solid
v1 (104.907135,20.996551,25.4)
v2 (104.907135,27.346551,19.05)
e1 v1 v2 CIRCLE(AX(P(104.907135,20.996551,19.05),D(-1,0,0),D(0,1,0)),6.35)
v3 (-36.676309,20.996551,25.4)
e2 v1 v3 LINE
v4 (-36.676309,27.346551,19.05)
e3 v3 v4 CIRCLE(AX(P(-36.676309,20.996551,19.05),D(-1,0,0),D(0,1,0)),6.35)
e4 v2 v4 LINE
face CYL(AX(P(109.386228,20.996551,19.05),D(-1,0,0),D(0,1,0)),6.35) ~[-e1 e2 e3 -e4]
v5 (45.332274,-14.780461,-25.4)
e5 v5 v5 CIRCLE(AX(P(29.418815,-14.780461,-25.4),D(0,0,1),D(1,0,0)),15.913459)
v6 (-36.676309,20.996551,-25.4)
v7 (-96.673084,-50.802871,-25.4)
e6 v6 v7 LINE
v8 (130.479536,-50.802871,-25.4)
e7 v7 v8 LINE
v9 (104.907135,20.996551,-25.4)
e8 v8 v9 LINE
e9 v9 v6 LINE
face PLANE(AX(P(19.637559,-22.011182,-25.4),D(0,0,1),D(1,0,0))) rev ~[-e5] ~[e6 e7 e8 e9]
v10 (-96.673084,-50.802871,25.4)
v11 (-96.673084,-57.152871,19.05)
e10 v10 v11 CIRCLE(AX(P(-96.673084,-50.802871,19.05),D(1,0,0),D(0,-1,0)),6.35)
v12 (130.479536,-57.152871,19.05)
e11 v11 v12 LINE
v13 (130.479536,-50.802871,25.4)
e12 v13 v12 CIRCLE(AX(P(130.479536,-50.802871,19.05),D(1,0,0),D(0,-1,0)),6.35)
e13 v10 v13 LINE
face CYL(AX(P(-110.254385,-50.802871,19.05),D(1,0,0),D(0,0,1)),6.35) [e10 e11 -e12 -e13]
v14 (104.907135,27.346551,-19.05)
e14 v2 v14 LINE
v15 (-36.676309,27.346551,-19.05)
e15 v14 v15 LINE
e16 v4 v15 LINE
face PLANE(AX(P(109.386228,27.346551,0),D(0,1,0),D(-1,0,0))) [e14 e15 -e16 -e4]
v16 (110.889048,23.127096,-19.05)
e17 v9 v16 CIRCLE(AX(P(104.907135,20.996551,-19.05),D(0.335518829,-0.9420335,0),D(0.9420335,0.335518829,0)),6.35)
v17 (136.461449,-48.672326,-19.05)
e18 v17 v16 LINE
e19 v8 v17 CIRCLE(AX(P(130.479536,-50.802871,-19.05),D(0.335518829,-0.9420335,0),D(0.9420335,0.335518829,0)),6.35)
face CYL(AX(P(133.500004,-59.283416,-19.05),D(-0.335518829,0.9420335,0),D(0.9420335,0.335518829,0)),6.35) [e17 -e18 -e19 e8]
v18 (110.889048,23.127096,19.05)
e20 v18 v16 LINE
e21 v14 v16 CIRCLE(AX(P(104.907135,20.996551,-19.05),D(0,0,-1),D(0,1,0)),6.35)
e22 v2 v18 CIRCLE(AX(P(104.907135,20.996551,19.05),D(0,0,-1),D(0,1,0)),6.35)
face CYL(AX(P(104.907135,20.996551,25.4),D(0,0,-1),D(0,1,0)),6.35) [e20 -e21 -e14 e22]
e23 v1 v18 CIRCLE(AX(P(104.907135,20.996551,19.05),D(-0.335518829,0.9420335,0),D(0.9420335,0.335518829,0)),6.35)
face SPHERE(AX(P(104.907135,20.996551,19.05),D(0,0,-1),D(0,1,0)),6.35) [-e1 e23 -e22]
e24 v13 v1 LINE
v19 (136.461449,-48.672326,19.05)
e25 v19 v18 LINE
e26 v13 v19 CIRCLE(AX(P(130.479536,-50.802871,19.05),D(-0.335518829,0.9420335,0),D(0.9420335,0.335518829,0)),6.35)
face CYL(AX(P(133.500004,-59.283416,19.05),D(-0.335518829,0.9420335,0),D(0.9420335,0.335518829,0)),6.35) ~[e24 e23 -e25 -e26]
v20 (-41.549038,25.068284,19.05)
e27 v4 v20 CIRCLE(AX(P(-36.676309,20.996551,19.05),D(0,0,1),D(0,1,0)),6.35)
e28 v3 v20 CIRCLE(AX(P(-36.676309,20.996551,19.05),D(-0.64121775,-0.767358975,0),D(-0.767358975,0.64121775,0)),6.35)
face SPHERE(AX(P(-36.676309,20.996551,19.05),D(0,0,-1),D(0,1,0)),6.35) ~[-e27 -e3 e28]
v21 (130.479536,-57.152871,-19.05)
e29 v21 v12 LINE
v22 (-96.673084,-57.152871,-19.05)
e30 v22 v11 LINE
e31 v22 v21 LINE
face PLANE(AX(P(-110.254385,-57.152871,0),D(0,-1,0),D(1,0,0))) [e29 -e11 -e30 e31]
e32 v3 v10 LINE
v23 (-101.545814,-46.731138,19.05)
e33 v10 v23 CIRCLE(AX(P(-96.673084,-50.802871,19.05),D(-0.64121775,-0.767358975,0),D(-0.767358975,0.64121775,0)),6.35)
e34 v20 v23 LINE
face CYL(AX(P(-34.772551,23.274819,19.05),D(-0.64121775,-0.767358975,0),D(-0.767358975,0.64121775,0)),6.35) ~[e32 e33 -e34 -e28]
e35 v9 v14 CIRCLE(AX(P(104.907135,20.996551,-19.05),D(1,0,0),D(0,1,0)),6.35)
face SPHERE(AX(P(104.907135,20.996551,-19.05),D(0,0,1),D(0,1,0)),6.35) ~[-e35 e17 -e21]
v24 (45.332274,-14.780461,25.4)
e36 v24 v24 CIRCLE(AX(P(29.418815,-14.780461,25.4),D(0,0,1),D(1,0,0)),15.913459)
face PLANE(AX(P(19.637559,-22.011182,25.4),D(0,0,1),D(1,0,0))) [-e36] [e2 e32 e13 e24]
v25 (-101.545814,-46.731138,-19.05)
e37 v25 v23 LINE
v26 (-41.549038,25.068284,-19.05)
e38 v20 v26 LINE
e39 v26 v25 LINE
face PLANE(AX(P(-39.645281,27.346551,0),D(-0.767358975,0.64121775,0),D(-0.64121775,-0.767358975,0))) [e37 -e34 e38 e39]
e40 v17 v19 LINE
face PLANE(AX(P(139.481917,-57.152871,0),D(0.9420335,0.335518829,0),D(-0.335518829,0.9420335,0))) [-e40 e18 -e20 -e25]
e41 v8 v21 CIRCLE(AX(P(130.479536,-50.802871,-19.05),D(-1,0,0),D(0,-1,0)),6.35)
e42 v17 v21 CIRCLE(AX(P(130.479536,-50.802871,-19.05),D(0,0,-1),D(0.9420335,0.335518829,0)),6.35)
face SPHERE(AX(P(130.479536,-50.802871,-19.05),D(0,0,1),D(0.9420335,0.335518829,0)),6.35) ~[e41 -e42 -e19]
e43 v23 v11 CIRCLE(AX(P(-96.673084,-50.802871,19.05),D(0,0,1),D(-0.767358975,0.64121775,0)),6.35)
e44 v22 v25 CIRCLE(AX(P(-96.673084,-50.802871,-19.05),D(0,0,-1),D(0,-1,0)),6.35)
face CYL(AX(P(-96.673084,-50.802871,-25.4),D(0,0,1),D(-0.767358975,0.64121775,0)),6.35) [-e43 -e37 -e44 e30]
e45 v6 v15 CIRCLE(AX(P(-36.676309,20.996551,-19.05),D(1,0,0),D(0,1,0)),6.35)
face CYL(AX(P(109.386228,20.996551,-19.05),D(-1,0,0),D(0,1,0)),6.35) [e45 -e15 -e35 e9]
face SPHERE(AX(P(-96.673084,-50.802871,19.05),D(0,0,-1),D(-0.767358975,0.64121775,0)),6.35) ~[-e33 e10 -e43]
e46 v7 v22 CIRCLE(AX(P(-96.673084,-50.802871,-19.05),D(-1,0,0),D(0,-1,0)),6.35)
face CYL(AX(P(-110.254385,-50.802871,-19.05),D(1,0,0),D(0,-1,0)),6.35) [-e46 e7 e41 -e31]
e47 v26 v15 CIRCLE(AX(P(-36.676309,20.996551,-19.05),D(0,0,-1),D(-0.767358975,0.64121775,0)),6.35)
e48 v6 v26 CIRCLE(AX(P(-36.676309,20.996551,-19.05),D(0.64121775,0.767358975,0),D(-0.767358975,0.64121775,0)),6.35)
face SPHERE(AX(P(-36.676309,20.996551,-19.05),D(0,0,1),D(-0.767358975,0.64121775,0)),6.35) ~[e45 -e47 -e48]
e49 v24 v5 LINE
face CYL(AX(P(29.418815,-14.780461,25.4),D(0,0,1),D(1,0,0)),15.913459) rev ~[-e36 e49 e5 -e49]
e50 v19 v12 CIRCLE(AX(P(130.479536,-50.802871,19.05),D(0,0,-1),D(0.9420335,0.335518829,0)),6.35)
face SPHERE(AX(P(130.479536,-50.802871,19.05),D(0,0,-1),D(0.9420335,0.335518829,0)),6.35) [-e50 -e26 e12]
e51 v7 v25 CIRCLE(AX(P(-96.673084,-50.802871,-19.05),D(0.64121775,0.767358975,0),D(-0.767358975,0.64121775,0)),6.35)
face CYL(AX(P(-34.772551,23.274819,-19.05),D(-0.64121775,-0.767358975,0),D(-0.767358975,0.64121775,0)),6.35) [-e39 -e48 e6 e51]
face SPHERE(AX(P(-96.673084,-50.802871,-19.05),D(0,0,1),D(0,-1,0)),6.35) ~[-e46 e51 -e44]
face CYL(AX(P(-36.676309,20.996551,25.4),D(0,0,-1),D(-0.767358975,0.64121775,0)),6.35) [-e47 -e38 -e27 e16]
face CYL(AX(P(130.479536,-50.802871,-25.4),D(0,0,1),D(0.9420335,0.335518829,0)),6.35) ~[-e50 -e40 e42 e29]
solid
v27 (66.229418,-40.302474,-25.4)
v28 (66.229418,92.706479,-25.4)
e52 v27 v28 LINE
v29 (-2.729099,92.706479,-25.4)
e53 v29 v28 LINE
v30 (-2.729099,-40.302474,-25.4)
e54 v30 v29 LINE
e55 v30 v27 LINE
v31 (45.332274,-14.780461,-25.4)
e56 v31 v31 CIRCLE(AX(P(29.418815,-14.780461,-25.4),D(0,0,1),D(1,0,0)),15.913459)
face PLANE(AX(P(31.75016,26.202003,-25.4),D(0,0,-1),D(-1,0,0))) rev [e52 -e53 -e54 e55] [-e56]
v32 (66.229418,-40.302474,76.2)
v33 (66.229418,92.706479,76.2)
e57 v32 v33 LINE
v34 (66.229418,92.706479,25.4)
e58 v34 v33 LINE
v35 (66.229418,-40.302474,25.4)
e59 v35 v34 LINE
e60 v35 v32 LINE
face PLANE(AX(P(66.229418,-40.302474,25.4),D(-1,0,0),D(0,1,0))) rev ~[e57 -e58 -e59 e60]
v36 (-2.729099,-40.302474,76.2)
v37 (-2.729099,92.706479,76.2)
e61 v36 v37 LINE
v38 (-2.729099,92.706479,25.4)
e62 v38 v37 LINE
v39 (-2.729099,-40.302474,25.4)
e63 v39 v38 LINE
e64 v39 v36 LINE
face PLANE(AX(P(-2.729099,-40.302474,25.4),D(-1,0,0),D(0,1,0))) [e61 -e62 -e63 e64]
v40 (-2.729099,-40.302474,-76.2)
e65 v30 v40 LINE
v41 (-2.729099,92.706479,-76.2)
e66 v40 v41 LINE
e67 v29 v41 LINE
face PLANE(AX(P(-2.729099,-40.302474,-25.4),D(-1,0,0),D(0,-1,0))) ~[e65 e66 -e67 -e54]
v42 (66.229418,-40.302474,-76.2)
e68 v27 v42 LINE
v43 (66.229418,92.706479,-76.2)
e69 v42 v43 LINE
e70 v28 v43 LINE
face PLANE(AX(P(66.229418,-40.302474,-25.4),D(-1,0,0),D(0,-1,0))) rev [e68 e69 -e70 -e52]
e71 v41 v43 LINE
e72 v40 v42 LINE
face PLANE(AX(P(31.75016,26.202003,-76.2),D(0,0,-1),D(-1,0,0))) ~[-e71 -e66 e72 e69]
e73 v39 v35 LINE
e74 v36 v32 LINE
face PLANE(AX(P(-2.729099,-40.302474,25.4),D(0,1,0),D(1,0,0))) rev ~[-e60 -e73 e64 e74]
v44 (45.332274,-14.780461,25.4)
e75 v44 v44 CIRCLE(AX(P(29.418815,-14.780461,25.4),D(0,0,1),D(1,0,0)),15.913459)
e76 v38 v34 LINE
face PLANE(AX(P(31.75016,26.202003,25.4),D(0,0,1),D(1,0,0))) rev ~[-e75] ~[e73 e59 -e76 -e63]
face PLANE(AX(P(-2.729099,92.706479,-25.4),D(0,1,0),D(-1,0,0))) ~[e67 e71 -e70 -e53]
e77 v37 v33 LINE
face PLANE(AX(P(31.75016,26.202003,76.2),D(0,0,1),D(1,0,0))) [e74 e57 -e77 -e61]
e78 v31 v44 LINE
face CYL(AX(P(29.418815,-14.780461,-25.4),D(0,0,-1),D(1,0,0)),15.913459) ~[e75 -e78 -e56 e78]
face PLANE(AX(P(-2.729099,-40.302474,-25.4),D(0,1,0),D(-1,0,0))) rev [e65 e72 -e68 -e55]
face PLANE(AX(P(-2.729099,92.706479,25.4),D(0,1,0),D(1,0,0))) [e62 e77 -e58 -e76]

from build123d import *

# Parameters (mm, degrees)
F1_DEPTH = 25.4
F2_R     = 6.35
F3_R     = 15.9134591768
F4_DEPTH = 50.801
F5_W     = 68.9585166983
F5_H     = 133.0089531839
F6_DEPTH = 50.8
F8_R     = 15.9134591768
F9_DEPTH = 50.8


with BuildPart() as f1:
    # F0 (on Top) → F1 (new body, symmetric)
    with BuildSketch(Plane.XY):
        Polygon((-39.645280689, 27.3465514183), (-110.2543845773, -57.1528710425), (139.4819170237, -57.1528710425), (109.386228025, 27.3465514183), align=None)
    extrude(amount=F1_DEPTH, both=True)

    # F2
    f2_edges = [f1.edges().sort_by_distance(p)[0] for p in [
        (109.386228, 27.346551, 0),
        (34.870474, 27.346551, -25.4),
        (-39.645281, 27.346551, 0),
        (34.870474, 27.346551, 25.4),
        (-74.949833, -14.90316, -25.4),
        (-110.254385, -57.152871, 0),
        (-74.949833, -14.90316, 25.4),
        (139.481917, -57.152871, 0),
        (124.434073, -14.90316, -25.4),
        (124.434073, -14.90316, 25.4),
        (14.613766, -57.152871, -25.4),
        (14.613766, -57.152871, 25.4),
    ]]
    fillet(f2_edges, radius=F2_R)

    # F3 (on face) → F4 (cut, through all)
    with BuildSketch(Plane.XY.offset(25.4)):
        with Locations((29.4188149273, -14.7804608569)):
            Circle(F3_R)
    extrude(amount=-F4_DEPTH, mode=Mode.SUBTRACT)


with BuildPart() as f6:
    # F5 (on face) → F6 (new body)
    with BuildSketch(Plane.XY.offset(25.4)):
        with Locations((31.7501595709, 26.2020025402)):
            Rectangle(F5_W, F5_H)
    extrude(amount=F6_DEPTH)


with BuildPart() as f7_1:
    # F7: instance of F6
    add(f6.part.mirror(Plane.XY))


with BuildPart() as f6_1:
    add(f6.part)

    add(f7_1.part)  # F9 merges F7_1
    # F8 (on face) → F9 (join, through all)
    with BuildSketch(Plane.XY.offset(-25.4)):
        with Locations((29.4188149273, -14.7804608569)):
            Circle(F8_R)
    extrude(amount=F9_DEPTH)


solid = Compound([f1.part, f6_1.part])
